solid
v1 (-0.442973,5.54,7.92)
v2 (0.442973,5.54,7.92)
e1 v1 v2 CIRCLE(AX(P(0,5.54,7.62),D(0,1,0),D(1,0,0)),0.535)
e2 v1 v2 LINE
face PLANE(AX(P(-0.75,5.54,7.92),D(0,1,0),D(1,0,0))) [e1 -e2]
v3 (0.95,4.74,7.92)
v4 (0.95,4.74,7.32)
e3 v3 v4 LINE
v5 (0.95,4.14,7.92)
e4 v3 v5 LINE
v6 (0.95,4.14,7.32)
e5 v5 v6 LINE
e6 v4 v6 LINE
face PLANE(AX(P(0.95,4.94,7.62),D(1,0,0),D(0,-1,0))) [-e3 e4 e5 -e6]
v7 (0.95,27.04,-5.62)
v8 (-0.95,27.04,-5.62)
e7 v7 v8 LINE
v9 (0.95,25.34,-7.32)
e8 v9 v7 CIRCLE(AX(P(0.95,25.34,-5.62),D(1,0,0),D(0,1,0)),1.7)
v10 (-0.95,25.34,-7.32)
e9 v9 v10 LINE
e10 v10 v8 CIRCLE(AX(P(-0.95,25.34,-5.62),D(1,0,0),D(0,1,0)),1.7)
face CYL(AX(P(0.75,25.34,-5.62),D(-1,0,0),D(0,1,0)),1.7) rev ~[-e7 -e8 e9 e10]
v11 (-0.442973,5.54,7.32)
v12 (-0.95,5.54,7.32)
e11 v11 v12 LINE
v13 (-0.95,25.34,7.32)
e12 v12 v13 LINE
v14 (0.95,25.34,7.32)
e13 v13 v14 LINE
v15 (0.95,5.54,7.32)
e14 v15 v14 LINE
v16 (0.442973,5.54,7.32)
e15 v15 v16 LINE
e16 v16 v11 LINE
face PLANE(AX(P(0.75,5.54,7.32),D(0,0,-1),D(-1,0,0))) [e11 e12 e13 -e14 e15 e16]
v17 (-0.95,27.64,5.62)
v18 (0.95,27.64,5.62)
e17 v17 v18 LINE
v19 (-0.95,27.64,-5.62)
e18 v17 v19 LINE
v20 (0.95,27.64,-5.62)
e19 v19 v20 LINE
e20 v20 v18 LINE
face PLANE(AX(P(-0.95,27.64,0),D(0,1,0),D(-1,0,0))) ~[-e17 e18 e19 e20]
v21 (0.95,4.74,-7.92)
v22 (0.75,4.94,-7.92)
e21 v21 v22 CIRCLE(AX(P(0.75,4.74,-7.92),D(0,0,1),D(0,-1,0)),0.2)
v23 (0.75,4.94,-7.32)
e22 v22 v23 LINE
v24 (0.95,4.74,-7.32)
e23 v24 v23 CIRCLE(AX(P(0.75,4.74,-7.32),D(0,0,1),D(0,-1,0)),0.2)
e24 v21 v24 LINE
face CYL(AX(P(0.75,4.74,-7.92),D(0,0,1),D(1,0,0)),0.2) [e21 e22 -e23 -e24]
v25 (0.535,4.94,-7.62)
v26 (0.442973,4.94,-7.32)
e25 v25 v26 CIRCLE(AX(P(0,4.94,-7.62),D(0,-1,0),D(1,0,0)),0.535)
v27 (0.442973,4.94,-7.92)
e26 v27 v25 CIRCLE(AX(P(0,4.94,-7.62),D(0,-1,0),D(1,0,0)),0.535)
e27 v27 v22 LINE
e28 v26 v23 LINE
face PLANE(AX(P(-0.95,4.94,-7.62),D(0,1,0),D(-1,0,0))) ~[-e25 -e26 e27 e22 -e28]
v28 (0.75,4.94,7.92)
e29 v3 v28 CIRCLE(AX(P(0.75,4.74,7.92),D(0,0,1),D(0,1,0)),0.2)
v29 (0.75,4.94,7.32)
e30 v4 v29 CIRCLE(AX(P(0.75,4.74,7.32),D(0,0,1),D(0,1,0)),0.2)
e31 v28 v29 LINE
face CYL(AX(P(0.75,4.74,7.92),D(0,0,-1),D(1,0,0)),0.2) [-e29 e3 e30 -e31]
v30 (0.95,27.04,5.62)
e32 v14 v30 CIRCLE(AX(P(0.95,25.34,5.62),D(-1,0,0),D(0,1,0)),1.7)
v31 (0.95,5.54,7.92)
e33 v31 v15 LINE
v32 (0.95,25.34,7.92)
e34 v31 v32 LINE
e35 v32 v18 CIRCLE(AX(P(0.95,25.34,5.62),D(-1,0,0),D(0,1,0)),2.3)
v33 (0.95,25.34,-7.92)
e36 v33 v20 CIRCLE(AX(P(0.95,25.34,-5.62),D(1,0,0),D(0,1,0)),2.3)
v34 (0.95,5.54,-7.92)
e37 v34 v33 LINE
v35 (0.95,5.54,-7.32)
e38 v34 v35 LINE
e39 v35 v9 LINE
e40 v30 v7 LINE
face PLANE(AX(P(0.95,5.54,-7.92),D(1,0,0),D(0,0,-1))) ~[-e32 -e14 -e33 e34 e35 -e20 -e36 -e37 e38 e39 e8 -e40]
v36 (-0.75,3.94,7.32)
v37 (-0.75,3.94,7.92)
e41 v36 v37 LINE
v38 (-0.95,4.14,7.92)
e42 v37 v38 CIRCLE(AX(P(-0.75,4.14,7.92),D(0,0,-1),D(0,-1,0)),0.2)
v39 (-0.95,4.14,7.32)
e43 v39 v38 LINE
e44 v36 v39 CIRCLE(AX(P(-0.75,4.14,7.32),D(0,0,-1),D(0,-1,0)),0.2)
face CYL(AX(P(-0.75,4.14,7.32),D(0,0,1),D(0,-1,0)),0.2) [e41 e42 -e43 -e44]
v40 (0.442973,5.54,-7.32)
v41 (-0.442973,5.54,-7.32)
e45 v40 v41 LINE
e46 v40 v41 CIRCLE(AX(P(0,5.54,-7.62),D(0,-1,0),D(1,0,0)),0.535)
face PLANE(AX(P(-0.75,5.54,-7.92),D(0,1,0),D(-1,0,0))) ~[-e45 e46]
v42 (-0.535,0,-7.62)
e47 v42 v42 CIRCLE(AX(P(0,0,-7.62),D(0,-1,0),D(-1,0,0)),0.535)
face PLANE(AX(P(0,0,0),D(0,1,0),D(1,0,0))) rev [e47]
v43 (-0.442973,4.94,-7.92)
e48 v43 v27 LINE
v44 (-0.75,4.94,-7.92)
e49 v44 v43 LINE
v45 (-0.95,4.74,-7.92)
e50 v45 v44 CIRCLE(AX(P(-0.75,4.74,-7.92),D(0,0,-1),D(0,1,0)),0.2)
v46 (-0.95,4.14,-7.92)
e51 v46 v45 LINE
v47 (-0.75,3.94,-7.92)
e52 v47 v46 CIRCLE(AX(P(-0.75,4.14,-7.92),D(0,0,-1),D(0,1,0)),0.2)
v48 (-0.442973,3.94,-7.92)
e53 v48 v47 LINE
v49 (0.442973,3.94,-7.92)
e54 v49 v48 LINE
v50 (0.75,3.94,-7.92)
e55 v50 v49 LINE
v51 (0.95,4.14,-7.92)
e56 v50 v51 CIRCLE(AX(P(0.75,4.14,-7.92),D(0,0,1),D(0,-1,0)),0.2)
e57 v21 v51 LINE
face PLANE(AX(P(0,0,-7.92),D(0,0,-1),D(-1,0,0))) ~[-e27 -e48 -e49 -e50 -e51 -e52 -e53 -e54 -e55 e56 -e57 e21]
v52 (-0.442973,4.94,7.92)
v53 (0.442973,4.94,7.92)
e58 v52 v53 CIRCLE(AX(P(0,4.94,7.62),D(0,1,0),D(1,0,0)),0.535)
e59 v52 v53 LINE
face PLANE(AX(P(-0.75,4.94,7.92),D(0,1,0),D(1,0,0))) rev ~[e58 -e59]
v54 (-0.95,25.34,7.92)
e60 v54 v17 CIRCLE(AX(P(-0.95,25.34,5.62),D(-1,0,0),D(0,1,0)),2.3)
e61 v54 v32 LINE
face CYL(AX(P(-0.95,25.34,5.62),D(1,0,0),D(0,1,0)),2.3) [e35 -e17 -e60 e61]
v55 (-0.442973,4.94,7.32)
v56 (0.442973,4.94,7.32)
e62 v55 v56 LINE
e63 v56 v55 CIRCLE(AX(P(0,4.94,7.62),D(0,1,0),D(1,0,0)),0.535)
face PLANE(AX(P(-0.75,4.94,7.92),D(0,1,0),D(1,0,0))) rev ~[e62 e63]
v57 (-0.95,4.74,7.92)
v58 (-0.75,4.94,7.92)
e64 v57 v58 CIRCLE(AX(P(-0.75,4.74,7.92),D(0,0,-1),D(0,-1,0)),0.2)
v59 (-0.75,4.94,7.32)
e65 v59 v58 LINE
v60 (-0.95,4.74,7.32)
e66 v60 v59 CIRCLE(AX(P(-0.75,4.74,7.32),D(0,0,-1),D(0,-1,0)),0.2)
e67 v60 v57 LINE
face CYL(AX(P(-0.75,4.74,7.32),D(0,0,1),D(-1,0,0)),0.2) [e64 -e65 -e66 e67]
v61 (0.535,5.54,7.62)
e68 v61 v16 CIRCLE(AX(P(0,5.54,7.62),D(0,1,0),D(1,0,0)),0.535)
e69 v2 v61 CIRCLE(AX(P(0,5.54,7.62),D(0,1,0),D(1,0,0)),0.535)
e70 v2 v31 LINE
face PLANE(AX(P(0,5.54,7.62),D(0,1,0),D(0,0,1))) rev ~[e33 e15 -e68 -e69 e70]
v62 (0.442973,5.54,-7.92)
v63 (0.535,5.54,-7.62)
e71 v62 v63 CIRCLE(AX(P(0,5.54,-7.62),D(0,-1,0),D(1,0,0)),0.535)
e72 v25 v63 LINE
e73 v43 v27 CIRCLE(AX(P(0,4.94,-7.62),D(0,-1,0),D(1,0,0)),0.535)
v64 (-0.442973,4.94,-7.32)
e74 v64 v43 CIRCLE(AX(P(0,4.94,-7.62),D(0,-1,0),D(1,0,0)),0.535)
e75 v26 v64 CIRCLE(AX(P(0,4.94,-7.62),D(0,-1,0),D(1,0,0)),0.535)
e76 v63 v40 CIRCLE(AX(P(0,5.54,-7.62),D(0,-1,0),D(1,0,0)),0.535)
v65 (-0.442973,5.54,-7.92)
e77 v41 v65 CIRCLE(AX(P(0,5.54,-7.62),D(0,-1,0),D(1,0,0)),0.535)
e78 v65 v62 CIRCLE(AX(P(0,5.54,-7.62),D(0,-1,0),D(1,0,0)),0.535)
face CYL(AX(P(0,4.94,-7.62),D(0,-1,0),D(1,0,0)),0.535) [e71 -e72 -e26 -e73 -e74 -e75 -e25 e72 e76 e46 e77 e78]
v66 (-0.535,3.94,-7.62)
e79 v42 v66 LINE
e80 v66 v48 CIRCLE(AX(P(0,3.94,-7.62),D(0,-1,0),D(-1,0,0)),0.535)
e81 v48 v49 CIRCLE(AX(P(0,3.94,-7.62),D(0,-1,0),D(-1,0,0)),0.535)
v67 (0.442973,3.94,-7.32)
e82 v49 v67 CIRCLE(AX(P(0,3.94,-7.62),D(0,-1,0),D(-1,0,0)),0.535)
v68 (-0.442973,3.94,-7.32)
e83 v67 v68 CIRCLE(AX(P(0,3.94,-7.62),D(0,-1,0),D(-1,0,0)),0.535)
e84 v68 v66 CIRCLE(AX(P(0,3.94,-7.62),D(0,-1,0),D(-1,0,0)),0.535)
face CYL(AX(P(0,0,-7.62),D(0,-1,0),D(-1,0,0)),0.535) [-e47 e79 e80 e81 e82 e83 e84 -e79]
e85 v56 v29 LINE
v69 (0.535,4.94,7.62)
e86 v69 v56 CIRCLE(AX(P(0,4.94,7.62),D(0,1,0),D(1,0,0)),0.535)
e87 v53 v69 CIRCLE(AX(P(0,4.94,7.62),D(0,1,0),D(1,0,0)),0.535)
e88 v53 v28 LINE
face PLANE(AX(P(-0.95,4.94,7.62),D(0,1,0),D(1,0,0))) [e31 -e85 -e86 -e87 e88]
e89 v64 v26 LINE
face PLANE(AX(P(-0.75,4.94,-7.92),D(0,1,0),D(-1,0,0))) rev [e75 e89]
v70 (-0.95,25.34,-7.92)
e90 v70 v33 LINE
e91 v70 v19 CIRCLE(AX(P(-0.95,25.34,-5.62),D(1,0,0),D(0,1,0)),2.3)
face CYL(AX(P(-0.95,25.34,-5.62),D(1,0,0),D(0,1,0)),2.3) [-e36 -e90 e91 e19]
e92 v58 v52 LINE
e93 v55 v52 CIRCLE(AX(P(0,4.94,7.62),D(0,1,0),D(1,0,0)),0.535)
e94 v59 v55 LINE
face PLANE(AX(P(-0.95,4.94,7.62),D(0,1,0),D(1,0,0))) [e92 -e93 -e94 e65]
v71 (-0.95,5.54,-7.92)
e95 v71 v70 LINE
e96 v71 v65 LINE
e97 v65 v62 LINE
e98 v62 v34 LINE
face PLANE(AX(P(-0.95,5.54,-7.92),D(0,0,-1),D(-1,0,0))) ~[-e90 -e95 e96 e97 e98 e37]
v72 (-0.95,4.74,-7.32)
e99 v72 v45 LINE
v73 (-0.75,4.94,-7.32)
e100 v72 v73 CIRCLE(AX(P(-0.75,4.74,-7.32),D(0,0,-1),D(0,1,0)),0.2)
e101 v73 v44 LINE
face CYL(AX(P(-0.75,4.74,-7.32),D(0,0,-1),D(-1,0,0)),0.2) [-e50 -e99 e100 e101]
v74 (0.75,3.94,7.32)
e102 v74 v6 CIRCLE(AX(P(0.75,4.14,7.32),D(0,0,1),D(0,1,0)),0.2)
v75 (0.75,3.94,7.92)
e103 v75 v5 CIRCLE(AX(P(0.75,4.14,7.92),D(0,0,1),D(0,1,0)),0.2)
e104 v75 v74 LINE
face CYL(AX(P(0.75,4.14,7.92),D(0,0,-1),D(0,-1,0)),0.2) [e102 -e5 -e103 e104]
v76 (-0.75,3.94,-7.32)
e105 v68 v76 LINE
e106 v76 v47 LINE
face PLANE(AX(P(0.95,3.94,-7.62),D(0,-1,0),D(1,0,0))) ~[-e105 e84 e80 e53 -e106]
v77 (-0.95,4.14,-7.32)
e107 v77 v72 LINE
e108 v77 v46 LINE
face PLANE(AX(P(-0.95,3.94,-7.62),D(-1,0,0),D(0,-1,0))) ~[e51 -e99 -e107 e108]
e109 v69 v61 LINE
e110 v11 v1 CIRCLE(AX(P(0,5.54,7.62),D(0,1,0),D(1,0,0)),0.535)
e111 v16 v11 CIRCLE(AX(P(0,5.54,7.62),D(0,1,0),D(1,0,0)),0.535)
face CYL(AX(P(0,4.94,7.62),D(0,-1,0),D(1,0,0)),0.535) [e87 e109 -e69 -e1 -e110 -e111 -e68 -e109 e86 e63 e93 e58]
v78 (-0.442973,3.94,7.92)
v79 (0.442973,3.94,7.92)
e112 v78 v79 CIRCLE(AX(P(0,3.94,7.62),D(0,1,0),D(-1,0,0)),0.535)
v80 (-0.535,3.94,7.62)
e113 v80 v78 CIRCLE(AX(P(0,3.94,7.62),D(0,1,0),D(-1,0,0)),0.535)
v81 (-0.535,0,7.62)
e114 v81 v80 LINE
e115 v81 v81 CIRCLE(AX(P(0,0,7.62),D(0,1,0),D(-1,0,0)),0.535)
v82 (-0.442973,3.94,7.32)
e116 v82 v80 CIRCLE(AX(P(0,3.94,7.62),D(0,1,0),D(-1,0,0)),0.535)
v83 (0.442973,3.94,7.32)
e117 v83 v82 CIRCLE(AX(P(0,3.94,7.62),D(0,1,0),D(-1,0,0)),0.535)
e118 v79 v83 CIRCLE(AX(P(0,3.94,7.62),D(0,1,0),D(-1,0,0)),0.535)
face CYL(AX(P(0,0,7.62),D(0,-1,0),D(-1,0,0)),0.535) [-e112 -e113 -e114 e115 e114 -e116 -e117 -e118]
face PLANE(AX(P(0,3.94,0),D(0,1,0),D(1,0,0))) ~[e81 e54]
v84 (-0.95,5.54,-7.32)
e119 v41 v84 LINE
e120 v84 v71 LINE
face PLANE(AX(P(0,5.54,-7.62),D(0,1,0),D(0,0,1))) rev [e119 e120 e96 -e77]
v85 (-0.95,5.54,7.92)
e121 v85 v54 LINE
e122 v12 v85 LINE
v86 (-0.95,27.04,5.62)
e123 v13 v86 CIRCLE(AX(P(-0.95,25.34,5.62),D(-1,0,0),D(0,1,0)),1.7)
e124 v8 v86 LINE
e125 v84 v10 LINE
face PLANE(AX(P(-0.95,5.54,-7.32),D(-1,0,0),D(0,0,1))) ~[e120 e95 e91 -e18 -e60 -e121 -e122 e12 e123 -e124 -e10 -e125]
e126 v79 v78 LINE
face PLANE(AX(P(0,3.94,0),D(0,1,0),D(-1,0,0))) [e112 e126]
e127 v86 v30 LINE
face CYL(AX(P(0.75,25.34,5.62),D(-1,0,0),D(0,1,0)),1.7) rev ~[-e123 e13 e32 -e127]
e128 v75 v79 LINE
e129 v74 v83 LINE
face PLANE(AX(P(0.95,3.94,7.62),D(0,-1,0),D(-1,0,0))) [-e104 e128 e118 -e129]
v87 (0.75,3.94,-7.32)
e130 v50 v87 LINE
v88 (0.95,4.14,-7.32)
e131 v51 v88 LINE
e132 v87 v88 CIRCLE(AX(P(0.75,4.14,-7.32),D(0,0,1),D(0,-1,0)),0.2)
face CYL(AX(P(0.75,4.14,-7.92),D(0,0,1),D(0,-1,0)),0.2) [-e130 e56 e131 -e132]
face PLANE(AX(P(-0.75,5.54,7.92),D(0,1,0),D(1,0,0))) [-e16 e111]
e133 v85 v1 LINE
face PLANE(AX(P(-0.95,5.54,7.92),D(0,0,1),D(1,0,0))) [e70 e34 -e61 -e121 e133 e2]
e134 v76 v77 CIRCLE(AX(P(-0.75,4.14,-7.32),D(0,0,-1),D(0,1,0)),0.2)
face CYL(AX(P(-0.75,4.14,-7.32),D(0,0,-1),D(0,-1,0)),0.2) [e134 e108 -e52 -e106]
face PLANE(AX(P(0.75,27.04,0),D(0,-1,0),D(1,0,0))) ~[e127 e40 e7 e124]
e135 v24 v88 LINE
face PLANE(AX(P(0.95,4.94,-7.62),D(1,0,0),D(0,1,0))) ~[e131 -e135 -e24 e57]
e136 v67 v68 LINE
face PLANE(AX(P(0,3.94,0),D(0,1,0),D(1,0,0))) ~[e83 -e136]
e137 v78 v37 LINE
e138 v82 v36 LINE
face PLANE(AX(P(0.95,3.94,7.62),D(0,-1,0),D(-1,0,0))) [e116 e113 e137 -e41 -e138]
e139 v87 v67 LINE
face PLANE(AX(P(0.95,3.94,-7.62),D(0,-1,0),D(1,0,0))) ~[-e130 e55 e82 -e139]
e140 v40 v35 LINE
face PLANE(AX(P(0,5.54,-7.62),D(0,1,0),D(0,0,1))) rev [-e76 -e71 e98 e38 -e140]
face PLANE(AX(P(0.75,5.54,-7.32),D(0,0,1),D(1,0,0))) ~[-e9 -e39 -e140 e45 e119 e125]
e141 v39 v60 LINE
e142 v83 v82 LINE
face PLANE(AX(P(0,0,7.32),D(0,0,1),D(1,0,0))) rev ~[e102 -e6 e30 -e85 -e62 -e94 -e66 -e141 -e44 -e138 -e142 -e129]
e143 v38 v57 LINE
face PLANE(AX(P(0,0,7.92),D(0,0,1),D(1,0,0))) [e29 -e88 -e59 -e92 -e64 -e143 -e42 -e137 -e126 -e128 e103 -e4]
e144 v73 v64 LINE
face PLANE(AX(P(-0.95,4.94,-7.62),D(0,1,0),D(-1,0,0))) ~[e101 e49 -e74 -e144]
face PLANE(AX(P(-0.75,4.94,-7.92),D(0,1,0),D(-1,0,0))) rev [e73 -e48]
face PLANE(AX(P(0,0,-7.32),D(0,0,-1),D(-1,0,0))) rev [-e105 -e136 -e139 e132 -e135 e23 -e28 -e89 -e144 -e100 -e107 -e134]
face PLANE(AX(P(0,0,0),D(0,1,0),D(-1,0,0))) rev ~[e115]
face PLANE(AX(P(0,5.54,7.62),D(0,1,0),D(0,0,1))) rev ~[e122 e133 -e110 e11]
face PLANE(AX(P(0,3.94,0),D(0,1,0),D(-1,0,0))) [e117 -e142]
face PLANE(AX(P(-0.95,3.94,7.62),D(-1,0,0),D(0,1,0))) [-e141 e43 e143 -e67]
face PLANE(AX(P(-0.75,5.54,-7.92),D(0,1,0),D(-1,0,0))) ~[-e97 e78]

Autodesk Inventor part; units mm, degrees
ref_plane "YZ Plane" through (0, 0, 0) normal (1, 0, 0) x (0, 1, 0)
ref_plane "XZ Plane" through (0, 0, 0) normal (0, 1, 0) x (-1, 0, 0)
sketch "Sketch1" plane through (0, 0, 0) normal (0, 1, 0) x (-1, 0, 0)
  circle A0 centre (0, 7.62) radius 0.535
  point P0 (0, 0)
  dimension "d0" = 1.07
  dimension "d1" = 7.62
extrude "Extrusion1" add sketch "Sketch1" along normal blind 3.94
ref_plane "Work Plane1" through (0, 0, 7.62) normal (0, 0, 1) x (1, 0, 0)
sketch "Sketch2" plane through (0, 0, 7.62) normal (0, 0, 1) x (1, 0, 0)
  line L0 (-0.95, 4.94) -> (0.95, 4.94)
  line L1 (0.95, 4.94) -> (0.95, 3.94)
  line L2 (0.95, 3.94) -> (-0.95, 3.94)
  line L3 (-0.95, 3.94) -> (-0.95, 4.94)
  line L4 (-0.535, 0) -> (0.535, 0) projected
  line L5 (0, 0) -> (0, -0.058)
  dimension "d5" = 3.94
  dimension "d6" = 1.9
  dimension "d7" = 0.95
  dimension "d8" = 1
extrude "Extrusion2" add sketch "Sketch2" along normal mid plane 0.6
fillet "Fillet1" radius 0.2 4 edges at (0.95, 3.94, 7.62) (0.95, 4.94, 7.62) (-0.95, 4.94, 7.62) (-0.95, 3.94, 7.62)
sketch "Sketch3" plane through (-0.75, 4.94, 7.92) normal (0, 1, 0) x (1, 0, 0)
  circle A0 centre (0.75, 0.3) radius 0.535
  point P0 (0.75, 7.92)
  dimension "d12" = 1.07
  dimension "d13" = 7.62
extrude "Extrusion3" add sketch "Sketch3" along normal blind 0.6
sketch "Sketch4" plane through (0, 5.54, 7.62) normal (0, 1, 0) x (1, 0, 0)
  line L0 (0.75, 0.3) -> (0.95, 0.3) projected
  line L1 (-0.95, -0.3) -> (0.95, -0.3)
  line L2 (0.95, -0.3) -> (0.95, 0.3)
  line L3 (0.95, 0.3) -> (-0.95, 0.3)
  line L4 (-0.95, 0.3) -> (-0.95, -0.3)
  point P0 (0, 7.62)
sketch "Sketch5" plane through (0, 0, 0) normal (1, 0, 0) x (0, 1, 0)
  line L0 (27.34, 0) -> (27.34, 5.62)
  line L1 (3.94, 7.085) -> (3.94, 7.32) projected
  line L2 (5.54, 7.085) -> (5.54, 8.155) projected
  line L3 (5.54, 7.62) -> (25.34, 7.62)
  arc A0 (27.34, 5.62) -> (25.34, 7.62) centre (25.34, 5.62) ccw
  point P0 (0, 0)
  dimension "d16" = 23.4
  dimension "d17" = 2
sweep "Sweep1" add profiles "Sketch4" path "Sketch5" path curves L3 A0 L0
mirror "Mirror1" about plane through (0, 0, 0) normal (0, 0, 1) of "Sweep1", "Extrusion3", "Fillet1", "Extrusion2", "Extrusion1"
ref_plane "Work Plane2" through (0, 0, -7.62) normal (0, 0, 1) x (1, 0, 0)
properties part number "OAR3R010FLF_CurrentSense"
